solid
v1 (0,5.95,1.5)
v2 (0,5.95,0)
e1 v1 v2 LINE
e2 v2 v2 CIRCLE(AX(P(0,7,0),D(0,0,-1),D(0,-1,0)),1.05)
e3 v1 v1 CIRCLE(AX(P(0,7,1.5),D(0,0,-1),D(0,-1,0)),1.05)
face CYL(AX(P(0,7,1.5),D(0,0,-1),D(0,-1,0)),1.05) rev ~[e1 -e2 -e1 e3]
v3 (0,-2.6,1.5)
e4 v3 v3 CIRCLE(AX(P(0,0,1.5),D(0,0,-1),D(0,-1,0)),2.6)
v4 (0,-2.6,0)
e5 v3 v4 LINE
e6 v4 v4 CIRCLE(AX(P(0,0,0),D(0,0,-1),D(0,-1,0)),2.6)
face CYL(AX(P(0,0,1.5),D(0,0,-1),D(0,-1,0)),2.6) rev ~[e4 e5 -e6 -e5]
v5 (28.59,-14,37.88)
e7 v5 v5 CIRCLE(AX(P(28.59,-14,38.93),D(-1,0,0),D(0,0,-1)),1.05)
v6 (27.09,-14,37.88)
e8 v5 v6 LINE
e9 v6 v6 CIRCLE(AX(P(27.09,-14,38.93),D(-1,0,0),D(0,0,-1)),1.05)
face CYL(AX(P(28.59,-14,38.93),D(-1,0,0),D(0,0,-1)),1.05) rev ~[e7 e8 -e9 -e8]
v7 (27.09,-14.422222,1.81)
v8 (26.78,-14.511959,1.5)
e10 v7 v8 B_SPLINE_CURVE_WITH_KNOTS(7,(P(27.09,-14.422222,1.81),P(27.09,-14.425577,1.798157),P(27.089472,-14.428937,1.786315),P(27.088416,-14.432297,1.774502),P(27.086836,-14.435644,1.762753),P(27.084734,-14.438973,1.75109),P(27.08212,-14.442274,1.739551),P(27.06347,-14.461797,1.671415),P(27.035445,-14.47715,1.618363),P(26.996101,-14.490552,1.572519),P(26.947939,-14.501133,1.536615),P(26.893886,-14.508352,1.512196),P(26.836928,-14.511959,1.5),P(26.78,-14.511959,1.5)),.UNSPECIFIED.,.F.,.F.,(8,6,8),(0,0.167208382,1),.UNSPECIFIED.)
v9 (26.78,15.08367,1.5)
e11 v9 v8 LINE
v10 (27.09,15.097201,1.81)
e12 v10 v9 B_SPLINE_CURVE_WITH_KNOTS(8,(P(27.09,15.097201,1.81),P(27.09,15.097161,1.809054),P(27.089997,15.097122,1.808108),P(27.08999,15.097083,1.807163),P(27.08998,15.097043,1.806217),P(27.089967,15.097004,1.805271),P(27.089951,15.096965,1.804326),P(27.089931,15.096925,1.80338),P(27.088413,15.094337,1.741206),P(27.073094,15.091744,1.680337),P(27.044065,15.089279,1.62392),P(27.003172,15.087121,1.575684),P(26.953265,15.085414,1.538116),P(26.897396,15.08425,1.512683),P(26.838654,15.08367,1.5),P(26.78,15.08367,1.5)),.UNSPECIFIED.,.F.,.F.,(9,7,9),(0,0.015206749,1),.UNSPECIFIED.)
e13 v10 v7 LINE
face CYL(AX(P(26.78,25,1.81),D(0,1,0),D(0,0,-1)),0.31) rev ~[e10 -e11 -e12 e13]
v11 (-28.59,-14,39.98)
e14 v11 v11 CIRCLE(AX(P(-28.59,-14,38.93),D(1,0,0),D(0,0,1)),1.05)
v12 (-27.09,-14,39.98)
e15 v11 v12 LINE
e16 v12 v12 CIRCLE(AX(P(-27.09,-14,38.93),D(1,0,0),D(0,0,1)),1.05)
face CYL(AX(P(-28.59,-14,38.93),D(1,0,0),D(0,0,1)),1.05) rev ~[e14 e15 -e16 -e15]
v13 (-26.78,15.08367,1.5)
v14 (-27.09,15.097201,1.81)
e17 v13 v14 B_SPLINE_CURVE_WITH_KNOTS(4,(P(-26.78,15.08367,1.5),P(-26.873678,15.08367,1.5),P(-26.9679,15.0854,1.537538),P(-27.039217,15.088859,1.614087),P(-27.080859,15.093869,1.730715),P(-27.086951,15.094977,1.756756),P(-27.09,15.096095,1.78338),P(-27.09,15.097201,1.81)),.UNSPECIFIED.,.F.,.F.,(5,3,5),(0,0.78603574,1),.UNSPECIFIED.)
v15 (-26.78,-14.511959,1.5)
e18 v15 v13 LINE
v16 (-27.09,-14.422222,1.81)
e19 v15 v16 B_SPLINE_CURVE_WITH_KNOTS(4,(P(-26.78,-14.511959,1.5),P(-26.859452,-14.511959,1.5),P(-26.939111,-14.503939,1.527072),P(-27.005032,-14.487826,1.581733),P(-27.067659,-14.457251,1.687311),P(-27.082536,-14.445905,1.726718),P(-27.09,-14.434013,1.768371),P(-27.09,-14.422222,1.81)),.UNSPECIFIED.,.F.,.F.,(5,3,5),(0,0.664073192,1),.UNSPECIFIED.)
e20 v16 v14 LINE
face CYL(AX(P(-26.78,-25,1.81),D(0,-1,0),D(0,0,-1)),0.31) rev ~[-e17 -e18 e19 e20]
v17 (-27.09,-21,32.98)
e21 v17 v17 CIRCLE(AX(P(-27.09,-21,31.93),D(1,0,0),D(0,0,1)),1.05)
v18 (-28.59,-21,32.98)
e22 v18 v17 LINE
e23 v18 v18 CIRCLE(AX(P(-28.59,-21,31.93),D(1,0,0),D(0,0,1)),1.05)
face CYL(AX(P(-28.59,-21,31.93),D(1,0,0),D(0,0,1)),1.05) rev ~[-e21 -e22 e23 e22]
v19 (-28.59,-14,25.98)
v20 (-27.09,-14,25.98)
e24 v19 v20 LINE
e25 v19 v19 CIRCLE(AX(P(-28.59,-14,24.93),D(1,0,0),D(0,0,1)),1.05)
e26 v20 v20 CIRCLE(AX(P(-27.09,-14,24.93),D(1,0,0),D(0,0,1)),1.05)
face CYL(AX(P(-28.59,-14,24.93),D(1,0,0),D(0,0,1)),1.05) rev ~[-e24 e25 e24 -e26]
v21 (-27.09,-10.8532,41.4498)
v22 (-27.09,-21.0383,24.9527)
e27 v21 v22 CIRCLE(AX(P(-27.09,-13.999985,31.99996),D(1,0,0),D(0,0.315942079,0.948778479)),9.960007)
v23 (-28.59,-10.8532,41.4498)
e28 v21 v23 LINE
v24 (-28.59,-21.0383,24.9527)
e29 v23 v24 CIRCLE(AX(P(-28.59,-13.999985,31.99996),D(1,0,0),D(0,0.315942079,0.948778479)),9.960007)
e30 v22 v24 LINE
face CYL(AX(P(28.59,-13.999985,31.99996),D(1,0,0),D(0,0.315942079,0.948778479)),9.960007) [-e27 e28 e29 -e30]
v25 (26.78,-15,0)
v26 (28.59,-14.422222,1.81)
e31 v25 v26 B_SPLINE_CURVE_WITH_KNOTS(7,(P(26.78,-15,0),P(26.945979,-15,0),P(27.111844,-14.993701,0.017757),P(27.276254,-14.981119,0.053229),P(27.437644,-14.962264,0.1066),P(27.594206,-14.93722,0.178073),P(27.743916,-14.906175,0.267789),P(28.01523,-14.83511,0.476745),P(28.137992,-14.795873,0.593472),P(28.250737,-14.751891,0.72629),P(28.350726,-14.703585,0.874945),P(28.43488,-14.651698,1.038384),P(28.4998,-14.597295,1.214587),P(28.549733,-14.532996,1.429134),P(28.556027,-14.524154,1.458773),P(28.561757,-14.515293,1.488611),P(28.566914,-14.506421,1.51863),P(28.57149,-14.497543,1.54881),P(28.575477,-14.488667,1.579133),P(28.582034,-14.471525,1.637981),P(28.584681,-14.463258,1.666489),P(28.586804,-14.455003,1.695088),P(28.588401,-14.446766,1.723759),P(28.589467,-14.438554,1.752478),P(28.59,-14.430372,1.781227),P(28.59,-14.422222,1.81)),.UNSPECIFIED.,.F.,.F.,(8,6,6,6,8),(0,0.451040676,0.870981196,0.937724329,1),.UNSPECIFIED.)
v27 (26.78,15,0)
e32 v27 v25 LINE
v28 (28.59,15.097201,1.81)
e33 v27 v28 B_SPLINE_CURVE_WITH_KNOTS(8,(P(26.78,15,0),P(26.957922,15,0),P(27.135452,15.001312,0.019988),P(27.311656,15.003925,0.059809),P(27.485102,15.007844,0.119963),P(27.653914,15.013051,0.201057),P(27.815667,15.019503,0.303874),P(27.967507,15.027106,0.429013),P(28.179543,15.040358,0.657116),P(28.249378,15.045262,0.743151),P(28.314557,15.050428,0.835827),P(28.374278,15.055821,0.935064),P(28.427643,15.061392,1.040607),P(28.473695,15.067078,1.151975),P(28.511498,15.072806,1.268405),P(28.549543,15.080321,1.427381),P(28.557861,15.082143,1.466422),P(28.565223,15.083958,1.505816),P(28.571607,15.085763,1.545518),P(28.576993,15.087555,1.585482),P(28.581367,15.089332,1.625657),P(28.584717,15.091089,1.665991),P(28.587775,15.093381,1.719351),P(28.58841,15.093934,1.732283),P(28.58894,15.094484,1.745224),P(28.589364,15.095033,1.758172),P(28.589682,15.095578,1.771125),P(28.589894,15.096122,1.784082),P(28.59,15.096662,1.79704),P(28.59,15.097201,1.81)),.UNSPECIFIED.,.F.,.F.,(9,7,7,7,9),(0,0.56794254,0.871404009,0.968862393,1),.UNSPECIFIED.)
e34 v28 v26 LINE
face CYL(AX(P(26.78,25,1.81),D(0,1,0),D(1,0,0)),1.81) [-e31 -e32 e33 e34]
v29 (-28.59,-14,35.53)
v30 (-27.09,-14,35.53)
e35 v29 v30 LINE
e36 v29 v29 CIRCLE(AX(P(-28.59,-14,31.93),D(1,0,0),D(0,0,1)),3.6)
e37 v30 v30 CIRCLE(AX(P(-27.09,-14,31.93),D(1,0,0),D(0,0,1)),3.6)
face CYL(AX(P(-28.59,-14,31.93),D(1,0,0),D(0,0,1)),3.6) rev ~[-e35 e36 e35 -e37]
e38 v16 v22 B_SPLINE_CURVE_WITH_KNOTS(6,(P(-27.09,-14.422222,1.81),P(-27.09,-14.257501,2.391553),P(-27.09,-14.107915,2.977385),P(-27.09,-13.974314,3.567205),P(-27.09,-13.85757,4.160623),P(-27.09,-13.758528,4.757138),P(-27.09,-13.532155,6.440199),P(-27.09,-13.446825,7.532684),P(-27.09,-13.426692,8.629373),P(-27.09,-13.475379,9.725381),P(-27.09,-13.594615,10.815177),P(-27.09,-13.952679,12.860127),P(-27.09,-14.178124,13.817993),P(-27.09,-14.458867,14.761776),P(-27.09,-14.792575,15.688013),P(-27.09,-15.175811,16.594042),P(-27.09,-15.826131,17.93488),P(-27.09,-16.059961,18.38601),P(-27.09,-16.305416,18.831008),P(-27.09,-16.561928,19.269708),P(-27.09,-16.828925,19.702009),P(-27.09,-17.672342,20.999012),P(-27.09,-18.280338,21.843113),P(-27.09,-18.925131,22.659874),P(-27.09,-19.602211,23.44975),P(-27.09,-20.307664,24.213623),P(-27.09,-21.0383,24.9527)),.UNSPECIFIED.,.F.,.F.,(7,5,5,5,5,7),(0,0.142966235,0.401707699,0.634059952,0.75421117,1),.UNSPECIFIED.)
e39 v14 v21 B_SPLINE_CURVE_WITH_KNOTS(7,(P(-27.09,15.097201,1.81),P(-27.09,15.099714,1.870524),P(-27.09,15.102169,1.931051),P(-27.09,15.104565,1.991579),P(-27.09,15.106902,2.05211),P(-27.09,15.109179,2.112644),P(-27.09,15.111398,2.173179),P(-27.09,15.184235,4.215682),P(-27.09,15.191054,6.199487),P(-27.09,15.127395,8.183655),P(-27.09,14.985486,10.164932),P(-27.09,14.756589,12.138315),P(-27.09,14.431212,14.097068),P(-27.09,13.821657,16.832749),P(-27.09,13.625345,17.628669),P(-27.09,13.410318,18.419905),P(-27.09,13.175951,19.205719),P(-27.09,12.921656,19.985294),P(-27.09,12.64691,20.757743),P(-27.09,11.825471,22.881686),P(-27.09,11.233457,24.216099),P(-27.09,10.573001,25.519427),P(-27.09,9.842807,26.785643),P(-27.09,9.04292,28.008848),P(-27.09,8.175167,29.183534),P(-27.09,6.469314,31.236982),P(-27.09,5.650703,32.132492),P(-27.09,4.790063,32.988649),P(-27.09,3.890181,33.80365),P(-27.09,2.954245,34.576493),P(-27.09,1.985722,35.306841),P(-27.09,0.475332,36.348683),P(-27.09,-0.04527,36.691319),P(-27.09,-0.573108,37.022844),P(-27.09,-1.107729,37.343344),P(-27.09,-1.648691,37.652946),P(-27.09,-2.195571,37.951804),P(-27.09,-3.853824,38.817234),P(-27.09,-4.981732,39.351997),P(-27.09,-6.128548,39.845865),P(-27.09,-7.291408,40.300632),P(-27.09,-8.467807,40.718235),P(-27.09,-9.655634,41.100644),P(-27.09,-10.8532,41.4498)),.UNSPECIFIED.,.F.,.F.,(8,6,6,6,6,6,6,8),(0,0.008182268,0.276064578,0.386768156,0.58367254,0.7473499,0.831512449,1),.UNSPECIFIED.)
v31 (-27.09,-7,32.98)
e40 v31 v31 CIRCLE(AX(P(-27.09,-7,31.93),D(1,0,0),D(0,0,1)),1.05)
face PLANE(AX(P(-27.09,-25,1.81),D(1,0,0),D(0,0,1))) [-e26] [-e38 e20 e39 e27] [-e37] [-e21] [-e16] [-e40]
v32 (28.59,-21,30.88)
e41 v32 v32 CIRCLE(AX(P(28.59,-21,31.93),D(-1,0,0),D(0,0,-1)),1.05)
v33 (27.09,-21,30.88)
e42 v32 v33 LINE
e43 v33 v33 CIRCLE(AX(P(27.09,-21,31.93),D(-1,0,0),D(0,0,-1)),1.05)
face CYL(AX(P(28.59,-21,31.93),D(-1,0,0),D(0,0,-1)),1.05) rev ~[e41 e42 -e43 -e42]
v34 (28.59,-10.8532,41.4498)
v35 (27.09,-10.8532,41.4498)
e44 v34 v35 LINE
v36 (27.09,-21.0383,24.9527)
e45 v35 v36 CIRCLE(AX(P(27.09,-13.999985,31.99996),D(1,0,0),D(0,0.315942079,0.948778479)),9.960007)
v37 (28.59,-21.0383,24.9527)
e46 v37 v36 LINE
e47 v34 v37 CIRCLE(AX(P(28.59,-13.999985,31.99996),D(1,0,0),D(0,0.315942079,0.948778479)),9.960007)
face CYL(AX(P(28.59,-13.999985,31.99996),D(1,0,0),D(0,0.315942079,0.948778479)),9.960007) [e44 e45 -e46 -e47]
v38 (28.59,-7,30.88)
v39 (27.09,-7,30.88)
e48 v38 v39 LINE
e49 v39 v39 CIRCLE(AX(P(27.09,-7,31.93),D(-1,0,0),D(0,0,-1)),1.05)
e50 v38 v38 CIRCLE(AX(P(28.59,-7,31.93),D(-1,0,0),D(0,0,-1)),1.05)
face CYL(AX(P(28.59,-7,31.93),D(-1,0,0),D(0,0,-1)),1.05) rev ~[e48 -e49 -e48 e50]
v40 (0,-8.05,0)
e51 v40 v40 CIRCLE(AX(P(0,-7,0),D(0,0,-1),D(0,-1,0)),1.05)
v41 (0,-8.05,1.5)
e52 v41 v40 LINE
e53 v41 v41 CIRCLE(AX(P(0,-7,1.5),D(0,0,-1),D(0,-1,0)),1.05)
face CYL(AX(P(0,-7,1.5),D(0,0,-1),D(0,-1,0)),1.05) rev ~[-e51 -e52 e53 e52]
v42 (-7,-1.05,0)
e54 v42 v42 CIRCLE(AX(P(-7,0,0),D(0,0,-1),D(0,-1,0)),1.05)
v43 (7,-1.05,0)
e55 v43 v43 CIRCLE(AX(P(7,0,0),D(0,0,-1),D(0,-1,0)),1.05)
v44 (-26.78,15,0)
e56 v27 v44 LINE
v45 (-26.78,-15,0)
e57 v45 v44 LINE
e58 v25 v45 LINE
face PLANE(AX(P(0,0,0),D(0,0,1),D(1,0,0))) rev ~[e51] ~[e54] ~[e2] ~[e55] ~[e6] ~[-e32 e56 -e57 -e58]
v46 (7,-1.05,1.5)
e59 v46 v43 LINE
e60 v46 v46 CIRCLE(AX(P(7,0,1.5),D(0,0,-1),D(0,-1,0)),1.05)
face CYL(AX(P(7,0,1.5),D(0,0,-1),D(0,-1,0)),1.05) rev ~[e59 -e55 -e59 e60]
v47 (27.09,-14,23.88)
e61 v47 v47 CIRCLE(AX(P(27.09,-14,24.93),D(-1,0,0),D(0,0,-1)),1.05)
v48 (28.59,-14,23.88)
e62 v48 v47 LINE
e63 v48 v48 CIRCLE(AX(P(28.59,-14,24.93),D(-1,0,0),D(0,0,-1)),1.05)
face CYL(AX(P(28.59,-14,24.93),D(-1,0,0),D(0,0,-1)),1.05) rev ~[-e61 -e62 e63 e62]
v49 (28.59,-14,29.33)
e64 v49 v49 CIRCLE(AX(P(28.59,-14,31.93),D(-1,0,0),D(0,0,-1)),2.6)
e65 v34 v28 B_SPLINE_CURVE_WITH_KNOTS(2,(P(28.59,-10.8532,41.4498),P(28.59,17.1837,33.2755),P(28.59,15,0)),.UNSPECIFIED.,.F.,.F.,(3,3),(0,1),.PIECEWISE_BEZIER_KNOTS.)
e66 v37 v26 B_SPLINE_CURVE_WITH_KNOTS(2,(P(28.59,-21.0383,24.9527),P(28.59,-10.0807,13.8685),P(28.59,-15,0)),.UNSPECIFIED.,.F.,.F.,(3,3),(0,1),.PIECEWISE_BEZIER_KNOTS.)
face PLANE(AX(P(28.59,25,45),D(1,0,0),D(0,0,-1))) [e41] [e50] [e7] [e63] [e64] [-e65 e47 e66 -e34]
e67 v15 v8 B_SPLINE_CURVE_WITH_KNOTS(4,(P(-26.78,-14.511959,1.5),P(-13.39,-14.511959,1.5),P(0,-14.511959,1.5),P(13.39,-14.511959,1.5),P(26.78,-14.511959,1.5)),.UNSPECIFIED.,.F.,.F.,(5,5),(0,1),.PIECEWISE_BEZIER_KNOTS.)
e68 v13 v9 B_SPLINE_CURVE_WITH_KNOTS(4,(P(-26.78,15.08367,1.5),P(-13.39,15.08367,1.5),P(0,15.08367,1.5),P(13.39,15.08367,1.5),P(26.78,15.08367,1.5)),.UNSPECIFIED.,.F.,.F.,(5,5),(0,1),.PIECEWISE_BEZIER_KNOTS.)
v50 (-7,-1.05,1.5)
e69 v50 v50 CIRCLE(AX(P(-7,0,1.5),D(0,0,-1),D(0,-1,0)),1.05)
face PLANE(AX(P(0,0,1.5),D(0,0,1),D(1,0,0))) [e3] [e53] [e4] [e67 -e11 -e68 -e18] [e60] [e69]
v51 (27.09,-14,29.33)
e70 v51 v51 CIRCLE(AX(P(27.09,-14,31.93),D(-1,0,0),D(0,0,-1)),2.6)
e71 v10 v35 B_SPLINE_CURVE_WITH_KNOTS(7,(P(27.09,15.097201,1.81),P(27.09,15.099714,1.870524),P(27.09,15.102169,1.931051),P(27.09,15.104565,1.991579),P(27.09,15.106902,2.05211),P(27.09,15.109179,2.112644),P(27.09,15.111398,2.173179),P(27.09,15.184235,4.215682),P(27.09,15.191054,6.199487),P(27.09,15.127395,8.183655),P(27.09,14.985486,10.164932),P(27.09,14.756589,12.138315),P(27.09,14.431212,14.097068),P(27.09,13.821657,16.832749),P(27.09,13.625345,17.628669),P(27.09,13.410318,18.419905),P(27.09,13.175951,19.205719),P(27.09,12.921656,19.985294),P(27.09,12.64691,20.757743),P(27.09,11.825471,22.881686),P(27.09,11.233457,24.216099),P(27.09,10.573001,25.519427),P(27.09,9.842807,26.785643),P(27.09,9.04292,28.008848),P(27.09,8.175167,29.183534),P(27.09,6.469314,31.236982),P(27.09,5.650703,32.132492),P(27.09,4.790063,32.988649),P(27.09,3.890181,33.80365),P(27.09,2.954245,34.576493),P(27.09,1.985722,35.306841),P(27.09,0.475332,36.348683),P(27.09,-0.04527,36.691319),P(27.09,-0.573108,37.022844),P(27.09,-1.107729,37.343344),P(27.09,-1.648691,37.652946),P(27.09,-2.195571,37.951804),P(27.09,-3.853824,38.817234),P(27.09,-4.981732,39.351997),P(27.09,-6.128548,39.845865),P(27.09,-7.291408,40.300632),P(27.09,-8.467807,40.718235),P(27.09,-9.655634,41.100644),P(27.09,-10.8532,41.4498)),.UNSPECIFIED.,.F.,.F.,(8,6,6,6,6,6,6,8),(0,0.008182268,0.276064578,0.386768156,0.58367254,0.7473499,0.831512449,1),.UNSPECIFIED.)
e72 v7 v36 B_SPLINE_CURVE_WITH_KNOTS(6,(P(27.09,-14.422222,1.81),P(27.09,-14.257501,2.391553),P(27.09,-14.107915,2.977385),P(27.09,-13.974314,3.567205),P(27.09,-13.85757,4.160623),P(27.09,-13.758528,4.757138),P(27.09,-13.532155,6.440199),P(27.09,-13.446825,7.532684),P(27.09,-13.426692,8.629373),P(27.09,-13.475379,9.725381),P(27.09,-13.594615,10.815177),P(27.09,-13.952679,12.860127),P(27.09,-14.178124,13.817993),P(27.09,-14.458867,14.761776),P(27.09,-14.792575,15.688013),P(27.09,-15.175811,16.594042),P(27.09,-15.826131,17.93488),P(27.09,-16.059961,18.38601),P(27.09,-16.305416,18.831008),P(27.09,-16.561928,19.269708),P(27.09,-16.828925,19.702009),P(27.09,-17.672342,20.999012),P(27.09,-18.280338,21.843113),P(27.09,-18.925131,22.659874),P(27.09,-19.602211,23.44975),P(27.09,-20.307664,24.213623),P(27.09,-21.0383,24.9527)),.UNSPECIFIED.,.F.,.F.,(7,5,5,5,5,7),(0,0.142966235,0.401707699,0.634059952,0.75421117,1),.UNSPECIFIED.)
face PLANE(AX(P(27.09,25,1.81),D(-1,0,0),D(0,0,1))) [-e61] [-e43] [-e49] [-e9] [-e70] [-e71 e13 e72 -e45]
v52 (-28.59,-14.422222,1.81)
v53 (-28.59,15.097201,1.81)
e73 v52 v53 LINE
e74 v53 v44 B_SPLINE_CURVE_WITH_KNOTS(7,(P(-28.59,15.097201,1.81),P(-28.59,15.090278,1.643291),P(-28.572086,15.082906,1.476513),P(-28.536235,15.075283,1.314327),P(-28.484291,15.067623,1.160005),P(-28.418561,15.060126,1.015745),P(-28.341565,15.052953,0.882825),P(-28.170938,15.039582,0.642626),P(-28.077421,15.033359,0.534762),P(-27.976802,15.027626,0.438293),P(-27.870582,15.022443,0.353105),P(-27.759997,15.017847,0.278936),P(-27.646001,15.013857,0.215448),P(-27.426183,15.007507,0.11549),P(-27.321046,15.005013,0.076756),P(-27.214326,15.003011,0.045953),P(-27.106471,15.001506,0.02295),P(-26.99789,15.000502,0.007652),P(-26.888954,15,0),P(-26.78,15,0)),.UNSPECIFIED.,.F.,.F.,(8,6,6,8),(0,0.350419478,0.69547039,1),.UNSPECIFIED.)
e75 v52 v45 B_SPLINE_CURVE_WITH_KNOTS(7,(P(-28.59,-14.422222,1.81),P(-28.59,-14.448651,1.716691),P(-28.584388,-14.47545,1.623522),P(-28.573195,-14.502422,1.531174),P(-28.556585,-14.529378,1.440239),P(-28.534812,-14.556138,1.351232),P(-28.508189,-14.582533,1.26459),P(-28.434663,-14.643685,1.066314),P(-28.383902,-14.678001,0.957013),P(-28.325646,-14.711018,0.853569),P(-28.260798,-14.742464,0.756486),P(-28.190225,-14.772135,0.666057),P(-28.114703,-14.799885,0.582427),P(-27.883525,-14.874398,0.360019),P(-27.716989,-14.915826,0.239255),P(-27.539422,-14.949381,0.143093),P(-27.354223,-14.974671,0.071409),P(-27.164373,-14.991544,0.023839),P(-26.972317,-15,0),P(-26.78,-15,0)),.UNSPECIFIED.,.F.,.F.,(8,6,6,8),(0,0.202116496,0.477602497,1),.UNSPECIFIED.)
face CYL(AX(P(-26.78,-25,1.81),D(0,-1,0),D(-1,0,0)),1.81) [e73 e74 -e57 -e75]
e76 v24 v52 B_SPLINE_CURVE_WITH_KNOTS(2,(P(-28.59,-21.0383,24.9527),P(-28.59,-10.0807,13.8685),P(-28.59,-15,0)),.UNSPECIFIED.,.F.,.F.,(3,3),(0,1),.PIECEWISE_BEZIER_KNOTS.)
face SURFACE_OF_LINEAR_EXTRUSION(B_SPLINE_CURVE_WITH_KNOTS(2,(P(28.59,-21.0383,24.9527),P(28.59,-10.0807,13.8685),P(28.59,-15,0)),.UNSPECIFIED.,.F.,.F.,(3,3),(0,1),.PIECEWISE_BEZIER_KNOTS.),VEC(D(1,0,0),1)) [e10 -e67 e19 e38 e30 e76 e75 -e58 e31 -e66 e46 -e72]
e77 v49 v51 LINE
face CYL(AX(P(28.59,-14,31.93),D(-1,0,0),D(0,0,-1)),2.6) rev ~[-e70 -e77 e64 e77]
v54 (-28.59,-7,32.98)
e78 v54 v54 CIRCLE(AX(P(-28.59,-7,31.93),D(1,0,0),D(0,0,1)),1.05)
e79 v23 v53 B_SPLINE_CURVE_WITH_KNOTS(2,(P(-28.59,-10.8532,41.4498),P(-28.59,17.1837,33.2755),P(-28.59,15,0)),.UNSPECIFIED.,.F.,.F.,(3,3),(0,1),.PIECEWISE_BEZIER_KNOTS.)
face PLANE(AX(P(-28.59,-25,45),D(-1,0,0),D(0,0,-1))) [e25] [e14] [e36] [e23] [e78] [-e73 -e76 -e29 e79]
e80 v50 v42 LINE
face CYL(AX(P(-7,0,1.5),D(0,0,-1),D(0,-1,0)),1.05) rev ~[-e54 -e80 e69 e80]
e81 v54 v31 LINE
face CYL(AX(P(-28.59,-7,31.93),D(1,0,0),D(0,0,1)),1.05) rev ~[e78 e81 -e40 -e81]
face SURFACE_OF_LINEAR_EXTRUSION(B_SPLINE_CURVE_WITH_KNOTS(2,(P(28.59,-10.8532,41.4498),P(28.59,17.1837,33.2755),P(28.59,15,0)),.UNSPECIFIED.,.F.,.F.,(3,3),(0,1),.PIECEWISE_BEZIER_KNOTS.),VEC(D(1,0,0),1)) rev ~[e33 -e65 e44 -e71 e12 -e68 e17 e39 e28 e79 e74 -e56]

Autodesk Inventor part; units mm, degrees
ref_plane "YZ Plane" through (0, 0, 0) normal (1, 0, 0) x (0, 1, 0)
ref_plane "XZ Plane" through (0, 0, 0) normal (0, 1, 0) x (-1, 0, 0)
ref_plane "XY Plane" through (0, 0, 0) normal (0, 0, 1) x (1, 0, 0)
sketch "Sketch1" plane through (0, 0, 0) normal (0, 0, 1) x (1, 0, 0)
  line L0 (-28.59, -25) -> (28.59, -25)
  line L1 (28.59, -25) -> (28.59, 25)
  line L2 (28.59, 25) -> (-28.59, 25)
  line L3 (-28.59, 25) -> (-28.59, -25)
  line L4 (-28.59, -25) -> (28.59, 25) construction
  line L5 (28.59, -25) -> (-28.59, 25) construction
  point P0 (0, 0)
  dimension "d0" = 57.18
  dimension "d1" = 50
extrude "Plate1" add sketch "Sketch1" along normal blind 1.5
sketch "Sketch2" plane through (-27.09, -25, 0) normal (-1, 0, 0) x (0, -1, 0)
  line L0 (-50, 0) -> (0, 0)
  line L1 (0, 0) -> (0, 45)
  line L2 (0, 45) -> (-50, 45)
  line L3 (-50, 45) -> (-50, 0)
edge flange "Flange1" height 45 angle 90 thickness 1.5 bend radius 0.31 thickness toward (-1, 0, 0) relief tear relief width 1.5 relief depth 0.75 corner gap 0.31 corner form 0 edges at (-28.59, 0, 1.5) (28.59, 0, 1.5) wall of the first edge with corners at (-27.09, 25, 0) (-27.09, -25, 0) (-27.09, -25, 45) (-27.09, 25, 45)
bend "Bend1"
corner "Corner1"
sketch "Sketch17" plane through (0, 0, 1.5) normal (0, 0, 1) x (1, 0, 0)
  circle A0 centre (0, 7) radius 0.7835
  circle A1 centre (7, 0) radius 0.7835
  circle A2 centre (0, -7) radius 0.7835
  circle A3 centre (-7, 0) radius 0.7835
  point P0 (0, 0)
hole "Hole7" at (0, 7, 1.5) at (7, 0, 1.5) at (0, -7, 1.5) at (-7, 0, 1.5) direction (0, 0, -1) diameter 2.1 depth 1.5
sketch "Sketch26" plane through (28.59, -25, 45) normal (1, 0, 0) x (0, 0, -1)
  arc A0 (3.5502, 14.1468) -> (20.0473, 3.9617) centre (13, 11) ccw
  line L0 (45, 50) -> (45, 0) projected
  spline S0 degree 2 poles (3.5502, 14.1468) (11.7245, 42.1837) (45, 40) knots 0 0 0 1 1 1
  spline S1 degree 2 poles (20.0473, 3.9617) (31.1315, 14.9193) (45, 10) knots 0 0 0 1 1 1
  line L1 (45, 10) -> (45, 40)
  line L2 (0, 0) -> (45, 0)
  line L3 (45, 0) -> (45, 50)
  line L4 (45, 50) -> (0, 50)
  line L5 (0, 50) -> (0, 0)
  point P0 (45, 25)
  point P1 (45, 25)
  point P2 (17.1562, 34.0829)
  point P3 (32.0366, 10.9995)
  dimension "d143" = 19.92
  dimension "d144" = 32
  dimension "d145" = 14
  dimension "d160" = 15
  dimension "d161" = 15
  dimension "d162" = 7.0473
  dimension "d163" = 9.4498
  dimension "d164" = 19.0366
  dimension "d165" = 7.0378
  dimension "d166" = 13.606
  dimension "d167" = 19.9361
extrude "Cut8" cut sketch "Sketch26" against normal blind 57.18 contours A0 S1 L0 L2 L5 L4 S0
sketch "Sketch27" plane through (-28.59, -14.4222, 1.81) normal (-1, 0, 0) x (0, 0, 1)
  circle A0 centre (23.12, 0.4222) radius 0.7835 projected
  circle A1 centre (30.12, -6.5778) radius 0.7835 projected
  circle A2 centre (30.12, 7.4222) radius 0.7835 projected
  circle A3 centre (37.12, 0.4222) radius 0.7835 projected
  point P0 (-1.81, 14.4222)
hole "Hole15" at (-28.59, -14, 24.93) at (-28.59, -7, 31.93) at (-28.59, -21, 31.93) at (-28.59, -14, 38.93) direction (1, 0, 0) diameter 2.1 depth 1.5
sketch "Sketch28" plane through (28.59, -14.4222, 1.81) normal (1, 0, 0) x (0, 0, -1)
  circle A0 centre (-23.12, 0.4222) radius 0.7835 projected
  circle A1 centre (-30.12, -6.5778) radius 0.7835 projected
  circle A2 centre (-37.12, 0.4222) radius 0.7835 projected
  circle A3 centre (-30.12, 7.4222) radius 0.7835 projected
  point P0 (1.81, 14.4222)
hole "Hole16" at (28.59, -14, 24.93) at (28.59, -7, 31.93) at (28.59, -21, 31.93) at (28.59, -14, 38.93) direction (-1, 0, 0) diameter 2.1 depth 1.5
sketch "Sketch29" plane through (-28.59, -14.4222, 1.81) normal (-1, 0, 0) x (0, 0, 1)
  circle A0 centre (30.12, 0.4222) radius 1.2295 projected
  point P0 (-1.81, 14.4222)
hole "Hole17" at (-28.59, -14, 31.93) direction (1, 0, 0) diameter 7.2 depth 1.5
sketch "Sketch30" plane through (28.59, -14.4222, 1.81) normal (1, 0, 0) x (0, 0, -1)
  circle A0 centre (-30.12, 0.4222) radius 1.75 projected
  point P0 (1.81, 14.4222)
hole "Hole18" at (28.59, -14, 31.93) direction (-1, 0, 0) diameter 5.2 depth 1.5
sketch "Sketch31" plane through (0, 0, 1.5) normal (0, 0, 1) x (1, 0, 0)
  circle A0 centre (0, 0) radius 1.75 projected
  point P0 (0, 0)
hole "Hole19" at (0, 0, 1.5) direction (0, 0, -1) diameter 5.2 depth 1.5
equation "\"d90\" = Thickness"
equation "\"d2\" = Thickness"
equation "\"d3\" = BendReliefWidth"
equation "\"d4\" = BendReliefDepth"
equation "\"d5\" = MinimumRemnant"
equation "\"d6\" = TransitionRadius"
equation "\"d9\" = BendRadius"
equation "\"d10\" = CornerReliefSize"
equation "\"d11\" = GapSize"
equation "\"d12\" = JacobiRadiusSize"
equation "\"BendReliefWidth\" = Thickness"
equation "\"BendReliefDepth\" = 0.5 * Thickness"
equation "\"CornerReliefSize\" = 4 * Thickness"
equation "\"MinimumRemnant\" = 2 * Thickness"
equation "\"TransitionRadius\" = BendRadius"
equation "\"JacobiRadiusSize\" = BendRadius"
equation "\"GapSize\" = Thickness"
equation "\"Thickness\" = 1.5"
equation "\"BendRadius\" = 0.31"
properties part number "axis_21_bottom_test_frame" material "Aluminum 6061-AHC"
